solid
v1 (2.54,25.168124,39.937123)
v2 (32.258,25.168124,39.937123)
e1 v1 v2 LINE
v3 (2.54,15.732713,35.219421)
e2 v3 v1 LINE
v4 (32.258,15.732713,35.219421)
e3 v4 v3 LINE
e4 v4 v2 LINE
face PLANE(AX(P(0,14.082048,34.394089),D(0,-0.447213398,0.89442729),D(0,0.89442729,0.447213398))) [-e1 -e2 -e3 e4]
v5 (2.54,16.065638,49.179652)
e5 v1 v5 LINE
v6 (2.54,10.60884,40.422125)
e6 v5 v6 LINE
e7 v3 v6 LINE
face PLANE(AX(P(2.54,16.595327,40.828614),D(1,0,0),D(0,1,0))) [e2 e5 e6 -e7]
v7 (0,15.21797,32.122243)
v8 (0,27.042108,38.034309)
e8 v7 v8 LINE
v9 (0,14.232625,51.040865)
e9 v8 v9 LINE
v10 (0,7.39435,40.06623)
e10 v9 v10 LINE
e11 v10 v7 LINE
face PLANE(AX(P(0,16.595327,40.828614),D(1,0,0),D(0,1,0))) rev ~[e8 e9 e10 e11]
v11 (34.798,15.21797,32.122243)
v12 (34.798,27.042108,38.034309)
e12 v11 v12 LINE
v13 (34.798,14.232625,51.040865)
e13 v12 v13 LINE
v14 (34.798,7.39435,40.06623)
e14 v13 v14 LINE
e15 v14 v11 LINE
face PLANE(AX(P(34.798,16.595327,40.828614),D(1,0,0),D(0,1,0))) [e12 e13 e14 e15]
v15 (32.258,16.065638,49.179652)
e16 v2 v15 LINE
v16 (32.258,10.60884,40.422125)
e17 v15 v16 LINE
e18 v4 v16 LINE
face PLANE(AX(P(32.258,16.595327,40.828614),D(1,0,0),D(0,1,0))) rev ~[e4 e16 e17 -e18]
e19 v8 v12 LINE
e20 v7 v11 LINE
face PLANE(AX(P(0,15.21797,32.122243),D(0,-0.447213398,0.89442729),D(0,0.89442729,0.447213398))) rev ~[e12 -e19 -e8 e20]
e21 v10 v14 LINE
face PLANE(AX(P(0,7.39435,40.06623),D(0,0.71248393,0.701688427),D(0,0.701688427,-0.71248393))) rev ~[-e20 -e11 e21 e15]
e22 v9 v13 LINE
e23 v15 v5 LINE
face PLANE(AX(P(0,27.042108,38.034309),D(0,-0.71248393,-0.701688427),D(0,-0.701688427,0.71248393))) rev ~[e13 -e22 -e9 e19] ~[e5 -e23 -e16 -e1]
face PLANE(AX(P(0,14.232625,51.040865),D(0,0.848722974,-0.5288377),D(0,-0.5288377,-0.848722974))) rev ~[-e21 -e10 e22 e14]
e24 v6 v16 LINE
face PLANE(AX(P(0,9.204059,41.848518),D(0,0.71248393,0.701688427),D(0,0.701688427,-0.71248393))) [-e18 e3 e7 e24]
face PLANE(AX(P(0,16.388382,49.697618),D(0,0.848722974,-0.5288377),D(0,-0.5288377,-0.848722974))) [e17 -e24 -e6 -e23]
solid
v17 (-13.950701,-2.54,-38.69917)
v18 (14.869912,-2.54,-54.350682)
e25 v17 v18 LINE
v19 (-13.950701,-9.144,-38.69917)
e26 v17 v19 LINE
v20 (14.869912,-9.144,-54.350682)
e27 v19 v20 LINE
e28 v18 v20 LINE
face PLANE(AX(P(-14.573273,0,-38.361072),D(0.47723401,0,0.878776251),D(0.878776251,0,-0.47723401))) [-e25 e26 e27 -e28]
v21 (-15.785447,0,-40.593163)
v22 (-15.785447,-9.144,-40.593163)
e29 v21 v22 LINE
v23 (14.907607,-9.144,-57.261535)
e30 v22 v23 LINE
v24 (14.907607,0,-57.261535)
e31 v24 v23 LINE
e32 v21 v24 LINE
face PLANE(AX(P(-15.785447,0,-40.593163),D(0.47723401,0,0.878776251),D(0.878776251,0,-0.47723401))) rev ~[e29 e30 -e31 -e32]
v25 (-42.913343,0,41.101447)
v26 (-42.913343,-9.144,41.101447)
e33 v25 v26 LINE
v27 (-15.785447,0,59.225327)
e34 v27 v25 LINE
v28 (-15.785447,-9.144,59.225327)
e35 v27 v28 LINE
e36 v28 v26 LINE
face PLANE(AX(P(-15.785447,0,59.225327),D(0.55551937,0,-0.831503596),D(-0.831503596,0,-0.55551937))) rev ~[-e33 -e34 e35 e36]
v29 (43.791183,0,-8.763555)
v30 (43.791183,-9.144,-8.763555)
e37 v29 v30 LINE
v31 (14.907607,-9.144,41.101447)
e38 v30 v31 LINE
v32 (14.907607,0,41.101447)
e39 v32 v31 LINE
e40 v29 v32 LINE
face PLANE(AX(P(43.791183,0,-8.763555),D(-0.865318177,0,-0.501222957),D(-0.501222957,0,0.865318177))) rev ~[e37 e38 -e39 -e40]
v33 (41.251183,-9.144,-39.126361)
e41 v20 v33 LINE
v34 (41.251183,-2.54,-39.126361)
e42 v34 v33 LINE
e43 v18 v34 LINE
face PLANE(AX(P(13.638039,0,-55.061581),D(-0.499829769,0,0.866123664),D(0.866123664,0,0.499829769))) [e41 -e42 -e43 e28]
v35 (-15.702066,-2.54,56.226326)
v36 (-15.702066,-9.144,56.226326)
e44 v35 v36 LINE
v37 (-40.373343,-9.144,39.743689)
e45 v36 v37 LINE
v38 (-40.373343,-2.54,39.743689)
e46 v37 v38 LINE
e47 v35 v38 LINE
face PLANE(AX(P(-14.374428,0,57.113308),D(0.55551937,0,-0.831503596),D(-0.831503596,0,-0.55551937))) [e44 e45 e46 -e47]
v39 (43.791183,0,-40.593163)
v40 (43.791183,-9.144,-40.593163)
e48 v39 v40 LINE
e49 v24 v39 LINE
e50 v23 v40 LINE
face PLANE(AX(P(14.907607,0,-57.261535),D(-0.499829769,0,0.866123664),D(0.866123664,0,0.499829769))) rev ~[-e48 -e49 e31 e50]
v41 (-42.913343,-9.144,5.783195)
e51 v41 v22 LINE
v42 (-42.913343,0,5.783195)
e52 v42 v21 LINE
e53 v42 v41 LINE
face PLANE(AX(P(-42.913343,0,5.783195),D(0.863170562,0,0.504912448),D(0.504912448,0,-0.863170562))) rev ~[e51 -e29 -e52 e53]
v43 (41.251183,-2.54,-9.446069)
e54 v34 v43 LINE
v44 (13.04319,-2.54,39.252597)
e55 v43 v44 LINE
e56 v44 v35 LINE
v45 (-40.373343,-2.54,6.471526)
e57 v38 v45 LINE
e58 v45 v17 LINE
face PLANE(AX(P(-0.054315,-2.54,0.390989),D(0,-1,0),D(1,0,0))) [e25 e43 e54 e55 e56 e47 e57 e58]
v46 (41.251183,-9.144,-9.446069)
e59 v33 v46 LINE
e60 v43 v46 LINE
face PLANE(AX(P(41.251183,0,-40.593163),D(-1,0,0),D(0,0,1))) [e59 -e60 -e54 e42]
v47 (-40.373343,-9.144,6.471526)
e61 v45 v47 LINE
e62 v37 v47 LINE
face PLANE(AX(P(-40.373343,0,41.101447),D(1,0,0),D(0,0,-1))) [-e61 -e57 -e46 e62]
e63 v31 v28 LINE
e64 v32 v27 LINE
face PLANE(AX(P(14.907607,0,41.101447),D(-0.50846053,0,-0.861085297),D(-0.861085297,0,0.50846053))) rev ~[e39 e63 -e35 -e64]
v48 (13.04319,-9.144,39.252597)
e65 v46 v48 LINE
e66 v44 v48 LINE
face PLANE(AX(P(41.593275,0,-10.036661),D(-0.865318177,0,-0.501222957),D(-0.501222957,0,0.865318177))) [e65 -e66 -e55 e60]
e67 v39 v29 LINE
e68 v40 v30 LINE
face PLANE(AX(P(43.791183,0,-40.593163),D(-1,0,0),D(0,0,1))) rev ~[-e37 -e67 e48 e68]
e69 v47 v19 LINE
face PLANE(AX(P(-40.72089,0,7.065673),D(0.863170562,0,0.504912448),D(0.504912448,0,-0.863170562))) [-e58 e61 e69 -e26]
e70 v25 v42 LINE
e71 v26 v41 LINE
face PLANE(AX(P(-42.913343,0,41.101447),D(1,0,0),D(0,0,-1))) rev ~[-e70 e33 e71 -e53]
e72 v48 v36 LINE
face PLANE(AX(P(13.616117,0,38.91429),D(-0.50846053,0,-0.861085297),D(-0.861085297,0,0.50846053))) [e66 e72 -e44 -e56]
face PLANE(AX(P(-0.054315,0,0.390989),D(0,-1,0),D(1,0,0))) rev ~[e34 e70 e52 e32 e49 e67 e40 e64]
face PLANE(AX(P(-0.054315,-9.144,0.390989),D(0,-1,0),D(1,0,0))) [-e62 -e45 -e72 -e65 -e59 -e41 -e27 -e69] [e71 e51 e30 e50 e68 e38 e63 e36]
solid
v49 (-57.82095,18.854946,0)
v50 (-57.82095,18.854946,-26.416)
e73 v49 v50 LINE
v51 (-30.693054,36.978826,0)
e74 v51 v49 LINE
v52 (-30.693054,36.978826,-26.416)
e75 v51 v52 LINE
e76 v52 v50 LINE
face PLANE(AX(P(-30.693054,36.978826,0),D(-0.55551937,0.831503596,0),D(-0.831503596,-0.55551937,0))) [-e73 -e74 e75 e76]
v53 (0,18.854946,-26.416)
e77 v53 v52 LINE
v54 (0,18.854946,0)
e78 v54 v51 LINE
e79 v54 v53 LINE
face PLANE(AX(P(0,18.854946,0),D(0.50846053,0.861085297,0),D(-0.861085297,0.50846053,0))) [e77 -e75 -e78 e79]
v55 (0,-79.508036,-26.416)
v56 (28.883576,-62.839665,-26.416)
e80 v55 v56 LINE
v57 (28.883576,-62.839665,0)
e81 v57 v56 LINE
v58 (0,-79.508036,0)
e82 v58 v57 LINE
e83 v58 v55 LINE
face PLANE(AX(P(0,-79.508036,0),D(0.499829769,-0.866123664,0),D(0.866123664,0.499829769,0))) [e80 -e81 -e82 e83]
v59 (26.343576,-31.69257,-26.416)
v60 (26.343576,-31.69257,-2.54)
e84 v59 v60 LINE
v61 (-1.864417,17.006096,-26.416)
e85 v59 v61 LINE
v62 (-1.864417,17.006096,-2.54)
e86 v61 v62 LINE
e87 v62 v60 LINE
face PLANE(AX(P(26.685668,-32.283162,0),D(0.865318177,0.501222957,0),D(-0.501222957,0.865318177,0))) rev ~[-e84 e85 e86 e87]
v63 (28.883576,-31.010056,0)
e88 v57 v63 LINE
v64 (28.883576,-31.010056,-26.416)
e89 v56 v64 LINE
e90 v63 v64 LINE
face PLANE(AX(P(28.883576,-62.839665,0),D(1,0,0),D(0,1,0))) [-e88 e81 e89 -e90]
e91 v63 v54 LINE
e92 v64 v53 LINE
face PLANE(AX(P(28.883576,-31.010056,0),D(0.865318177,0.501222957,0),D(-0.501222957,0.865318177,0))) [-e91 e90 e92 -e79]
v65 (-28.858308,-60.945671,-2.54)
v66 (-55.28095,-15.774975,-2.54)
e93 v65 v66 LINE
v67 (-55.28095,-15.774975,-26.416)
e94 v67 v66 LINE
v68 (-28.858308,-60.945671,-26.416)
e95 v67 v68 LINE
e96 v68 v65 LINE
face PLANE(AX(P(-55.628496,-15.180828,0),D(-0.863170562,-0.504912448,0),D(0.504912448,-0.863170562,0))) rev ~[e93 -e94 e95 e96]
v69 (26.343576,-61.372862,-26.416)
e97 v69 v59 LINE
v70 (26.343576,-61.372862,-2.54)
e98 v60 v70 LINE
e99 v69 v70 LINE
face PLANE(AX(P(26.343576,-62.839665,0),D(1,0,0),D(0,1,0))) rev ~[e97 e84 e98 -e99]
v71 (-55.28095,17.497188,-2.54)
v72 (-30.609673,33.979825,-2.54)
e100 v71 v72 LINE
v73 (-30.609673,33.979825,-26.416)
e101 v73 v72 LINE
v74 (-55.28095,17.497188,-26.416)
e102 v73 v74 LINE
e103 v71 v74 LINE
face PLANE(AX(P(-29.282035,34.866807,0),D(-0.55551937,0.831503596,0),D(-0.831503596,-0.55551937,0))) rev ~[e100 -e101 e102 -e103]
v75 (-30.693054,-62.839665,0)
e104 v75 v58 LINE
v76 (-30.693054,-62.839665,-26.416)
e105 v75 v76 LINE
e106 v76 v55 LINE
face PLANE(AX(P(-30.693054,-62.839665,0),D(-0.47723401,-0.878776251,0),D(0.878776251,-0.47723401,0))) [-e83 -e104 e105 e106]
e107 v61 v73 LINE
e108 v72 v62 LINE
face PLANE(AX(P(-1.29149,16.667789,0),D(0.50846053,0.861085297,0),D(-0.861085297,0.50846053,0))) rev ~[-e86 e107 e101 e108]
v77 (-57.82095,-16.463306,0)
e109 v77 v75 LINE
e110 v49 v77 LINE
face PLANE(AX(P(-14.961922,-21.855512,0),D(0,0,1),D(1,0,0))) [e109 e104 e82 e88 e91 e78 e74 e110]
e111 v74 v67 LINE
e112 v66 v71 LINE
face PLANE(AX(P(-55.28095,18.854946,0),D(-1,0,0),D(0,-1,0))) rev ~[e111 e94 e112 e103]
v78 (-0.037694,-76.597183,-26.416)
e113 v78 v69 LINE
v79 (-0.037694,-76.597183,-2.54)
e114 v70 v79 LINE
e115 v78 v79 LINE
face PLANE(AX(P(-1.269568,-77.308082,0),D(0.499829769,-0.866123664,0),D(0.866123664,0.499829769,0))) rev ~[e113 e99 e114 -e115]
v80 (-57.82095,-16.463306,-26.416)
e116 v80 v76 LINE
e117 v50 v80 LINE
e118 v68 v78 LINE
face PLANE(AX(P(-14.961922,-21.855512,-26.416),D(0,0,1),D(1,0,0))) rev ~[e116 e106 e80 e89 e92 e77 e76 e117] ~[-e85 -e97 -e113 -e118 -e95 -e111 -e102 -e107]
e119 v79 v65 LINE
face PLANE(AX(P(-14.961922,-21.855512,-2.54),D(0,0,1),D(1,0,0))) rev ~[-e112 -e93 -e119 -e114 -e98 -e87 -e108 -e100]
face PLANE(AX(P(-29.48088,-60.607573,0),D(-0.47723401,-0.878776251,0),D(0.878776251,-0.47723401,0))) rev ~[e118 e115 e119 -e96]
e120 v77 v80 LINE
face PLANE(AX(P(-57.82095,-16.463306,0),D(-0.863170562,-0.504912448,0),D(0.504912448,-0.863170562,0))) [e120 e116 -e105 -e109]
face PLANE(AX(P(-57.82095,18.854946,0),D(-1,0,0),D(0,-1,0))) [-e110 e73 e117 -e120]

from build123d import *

# Parameters (mm, degrees)
F2_DEPTH  = 26.416
F3_T      = -2.54
F4_DEPTH  = 34.798
F5_T      = -2.54
F10_DEPTH = 9.144
F11_T     = -2.54


# Not quite as in the source:
# - a feature of the source that left no trace in its solid (it failed there, or was rolled back) is left out


with BuildPart() as f2:
    # F0 (on Top) → F2 (new body)
    with BuildSketch(Plane.XY):
        Polygon((-57.8209497035, 18.8549458981), (-57.8209497035, -16.4633058012), (-30.6930541992, -62.8396645188), (0, -79.508036375), (28.8835763931, -62.8396645188), (28.8835763931, -31.0100559145), (0, 18.8549458981), (-30.6930541992, 36.9788259268), align=None)
    extrude(amount=-F2_DEPTH)

    # F3
    f3_openings = [f2.faces().sort_by_distance(p)[0] for p in [
        (-15.016134, -21.984576, -26.416),
    ]]
    offset(amount=F3_T, openings=f3_openings)


with BuildPart() as f4:
    # F1 (on Right) → F4 (new body)
    with BuildSketch(Plane.YZ):
        Polygon((27.0421076566, 38.0343087018), (14.2326252535, 51.0408654809), (7.3943502405, 40.0662297715), (15.2179701254, 32.1222431958), align=None)
    extrude(amount=F4_DEPTH)

    # F5
    f5_openings = [f4.faces().sort_by_distance(p)[0] for p in [
        (17.399, 20.637366, 44.537587),
    ]]
    offset(amount=F5_T, openings=f5_openings)


with BuildPart() as f10:
    # F9 (on Front) → F10 (new body)
    with BuildSketch(Plane.XZ):
        Polygon((-42.9133428261, 41.1014470737), (-42.9133428261, 5.7831953745), (-15.7854473218, -40.5931633431), (14.9076068774, -57.2615351994), (43.7911832705, -40.5931633431), (43.7911832705, -8.7635547388), (14.9076068774, 41.1014470737), (-15.7854473218, 59.2253271025), align=None)
    extrude(amount=F10_DEPTH)

    # F11
    f11_openings = [f10.faces().sort_by_distance(p)[0] for p in [
        (-0.108527, -9.144, 0.261925),
    ]]
    offset(amount=F11_T, openings=f11_openings)


solid = Compound([f2.part, f4.part, f10.part])
